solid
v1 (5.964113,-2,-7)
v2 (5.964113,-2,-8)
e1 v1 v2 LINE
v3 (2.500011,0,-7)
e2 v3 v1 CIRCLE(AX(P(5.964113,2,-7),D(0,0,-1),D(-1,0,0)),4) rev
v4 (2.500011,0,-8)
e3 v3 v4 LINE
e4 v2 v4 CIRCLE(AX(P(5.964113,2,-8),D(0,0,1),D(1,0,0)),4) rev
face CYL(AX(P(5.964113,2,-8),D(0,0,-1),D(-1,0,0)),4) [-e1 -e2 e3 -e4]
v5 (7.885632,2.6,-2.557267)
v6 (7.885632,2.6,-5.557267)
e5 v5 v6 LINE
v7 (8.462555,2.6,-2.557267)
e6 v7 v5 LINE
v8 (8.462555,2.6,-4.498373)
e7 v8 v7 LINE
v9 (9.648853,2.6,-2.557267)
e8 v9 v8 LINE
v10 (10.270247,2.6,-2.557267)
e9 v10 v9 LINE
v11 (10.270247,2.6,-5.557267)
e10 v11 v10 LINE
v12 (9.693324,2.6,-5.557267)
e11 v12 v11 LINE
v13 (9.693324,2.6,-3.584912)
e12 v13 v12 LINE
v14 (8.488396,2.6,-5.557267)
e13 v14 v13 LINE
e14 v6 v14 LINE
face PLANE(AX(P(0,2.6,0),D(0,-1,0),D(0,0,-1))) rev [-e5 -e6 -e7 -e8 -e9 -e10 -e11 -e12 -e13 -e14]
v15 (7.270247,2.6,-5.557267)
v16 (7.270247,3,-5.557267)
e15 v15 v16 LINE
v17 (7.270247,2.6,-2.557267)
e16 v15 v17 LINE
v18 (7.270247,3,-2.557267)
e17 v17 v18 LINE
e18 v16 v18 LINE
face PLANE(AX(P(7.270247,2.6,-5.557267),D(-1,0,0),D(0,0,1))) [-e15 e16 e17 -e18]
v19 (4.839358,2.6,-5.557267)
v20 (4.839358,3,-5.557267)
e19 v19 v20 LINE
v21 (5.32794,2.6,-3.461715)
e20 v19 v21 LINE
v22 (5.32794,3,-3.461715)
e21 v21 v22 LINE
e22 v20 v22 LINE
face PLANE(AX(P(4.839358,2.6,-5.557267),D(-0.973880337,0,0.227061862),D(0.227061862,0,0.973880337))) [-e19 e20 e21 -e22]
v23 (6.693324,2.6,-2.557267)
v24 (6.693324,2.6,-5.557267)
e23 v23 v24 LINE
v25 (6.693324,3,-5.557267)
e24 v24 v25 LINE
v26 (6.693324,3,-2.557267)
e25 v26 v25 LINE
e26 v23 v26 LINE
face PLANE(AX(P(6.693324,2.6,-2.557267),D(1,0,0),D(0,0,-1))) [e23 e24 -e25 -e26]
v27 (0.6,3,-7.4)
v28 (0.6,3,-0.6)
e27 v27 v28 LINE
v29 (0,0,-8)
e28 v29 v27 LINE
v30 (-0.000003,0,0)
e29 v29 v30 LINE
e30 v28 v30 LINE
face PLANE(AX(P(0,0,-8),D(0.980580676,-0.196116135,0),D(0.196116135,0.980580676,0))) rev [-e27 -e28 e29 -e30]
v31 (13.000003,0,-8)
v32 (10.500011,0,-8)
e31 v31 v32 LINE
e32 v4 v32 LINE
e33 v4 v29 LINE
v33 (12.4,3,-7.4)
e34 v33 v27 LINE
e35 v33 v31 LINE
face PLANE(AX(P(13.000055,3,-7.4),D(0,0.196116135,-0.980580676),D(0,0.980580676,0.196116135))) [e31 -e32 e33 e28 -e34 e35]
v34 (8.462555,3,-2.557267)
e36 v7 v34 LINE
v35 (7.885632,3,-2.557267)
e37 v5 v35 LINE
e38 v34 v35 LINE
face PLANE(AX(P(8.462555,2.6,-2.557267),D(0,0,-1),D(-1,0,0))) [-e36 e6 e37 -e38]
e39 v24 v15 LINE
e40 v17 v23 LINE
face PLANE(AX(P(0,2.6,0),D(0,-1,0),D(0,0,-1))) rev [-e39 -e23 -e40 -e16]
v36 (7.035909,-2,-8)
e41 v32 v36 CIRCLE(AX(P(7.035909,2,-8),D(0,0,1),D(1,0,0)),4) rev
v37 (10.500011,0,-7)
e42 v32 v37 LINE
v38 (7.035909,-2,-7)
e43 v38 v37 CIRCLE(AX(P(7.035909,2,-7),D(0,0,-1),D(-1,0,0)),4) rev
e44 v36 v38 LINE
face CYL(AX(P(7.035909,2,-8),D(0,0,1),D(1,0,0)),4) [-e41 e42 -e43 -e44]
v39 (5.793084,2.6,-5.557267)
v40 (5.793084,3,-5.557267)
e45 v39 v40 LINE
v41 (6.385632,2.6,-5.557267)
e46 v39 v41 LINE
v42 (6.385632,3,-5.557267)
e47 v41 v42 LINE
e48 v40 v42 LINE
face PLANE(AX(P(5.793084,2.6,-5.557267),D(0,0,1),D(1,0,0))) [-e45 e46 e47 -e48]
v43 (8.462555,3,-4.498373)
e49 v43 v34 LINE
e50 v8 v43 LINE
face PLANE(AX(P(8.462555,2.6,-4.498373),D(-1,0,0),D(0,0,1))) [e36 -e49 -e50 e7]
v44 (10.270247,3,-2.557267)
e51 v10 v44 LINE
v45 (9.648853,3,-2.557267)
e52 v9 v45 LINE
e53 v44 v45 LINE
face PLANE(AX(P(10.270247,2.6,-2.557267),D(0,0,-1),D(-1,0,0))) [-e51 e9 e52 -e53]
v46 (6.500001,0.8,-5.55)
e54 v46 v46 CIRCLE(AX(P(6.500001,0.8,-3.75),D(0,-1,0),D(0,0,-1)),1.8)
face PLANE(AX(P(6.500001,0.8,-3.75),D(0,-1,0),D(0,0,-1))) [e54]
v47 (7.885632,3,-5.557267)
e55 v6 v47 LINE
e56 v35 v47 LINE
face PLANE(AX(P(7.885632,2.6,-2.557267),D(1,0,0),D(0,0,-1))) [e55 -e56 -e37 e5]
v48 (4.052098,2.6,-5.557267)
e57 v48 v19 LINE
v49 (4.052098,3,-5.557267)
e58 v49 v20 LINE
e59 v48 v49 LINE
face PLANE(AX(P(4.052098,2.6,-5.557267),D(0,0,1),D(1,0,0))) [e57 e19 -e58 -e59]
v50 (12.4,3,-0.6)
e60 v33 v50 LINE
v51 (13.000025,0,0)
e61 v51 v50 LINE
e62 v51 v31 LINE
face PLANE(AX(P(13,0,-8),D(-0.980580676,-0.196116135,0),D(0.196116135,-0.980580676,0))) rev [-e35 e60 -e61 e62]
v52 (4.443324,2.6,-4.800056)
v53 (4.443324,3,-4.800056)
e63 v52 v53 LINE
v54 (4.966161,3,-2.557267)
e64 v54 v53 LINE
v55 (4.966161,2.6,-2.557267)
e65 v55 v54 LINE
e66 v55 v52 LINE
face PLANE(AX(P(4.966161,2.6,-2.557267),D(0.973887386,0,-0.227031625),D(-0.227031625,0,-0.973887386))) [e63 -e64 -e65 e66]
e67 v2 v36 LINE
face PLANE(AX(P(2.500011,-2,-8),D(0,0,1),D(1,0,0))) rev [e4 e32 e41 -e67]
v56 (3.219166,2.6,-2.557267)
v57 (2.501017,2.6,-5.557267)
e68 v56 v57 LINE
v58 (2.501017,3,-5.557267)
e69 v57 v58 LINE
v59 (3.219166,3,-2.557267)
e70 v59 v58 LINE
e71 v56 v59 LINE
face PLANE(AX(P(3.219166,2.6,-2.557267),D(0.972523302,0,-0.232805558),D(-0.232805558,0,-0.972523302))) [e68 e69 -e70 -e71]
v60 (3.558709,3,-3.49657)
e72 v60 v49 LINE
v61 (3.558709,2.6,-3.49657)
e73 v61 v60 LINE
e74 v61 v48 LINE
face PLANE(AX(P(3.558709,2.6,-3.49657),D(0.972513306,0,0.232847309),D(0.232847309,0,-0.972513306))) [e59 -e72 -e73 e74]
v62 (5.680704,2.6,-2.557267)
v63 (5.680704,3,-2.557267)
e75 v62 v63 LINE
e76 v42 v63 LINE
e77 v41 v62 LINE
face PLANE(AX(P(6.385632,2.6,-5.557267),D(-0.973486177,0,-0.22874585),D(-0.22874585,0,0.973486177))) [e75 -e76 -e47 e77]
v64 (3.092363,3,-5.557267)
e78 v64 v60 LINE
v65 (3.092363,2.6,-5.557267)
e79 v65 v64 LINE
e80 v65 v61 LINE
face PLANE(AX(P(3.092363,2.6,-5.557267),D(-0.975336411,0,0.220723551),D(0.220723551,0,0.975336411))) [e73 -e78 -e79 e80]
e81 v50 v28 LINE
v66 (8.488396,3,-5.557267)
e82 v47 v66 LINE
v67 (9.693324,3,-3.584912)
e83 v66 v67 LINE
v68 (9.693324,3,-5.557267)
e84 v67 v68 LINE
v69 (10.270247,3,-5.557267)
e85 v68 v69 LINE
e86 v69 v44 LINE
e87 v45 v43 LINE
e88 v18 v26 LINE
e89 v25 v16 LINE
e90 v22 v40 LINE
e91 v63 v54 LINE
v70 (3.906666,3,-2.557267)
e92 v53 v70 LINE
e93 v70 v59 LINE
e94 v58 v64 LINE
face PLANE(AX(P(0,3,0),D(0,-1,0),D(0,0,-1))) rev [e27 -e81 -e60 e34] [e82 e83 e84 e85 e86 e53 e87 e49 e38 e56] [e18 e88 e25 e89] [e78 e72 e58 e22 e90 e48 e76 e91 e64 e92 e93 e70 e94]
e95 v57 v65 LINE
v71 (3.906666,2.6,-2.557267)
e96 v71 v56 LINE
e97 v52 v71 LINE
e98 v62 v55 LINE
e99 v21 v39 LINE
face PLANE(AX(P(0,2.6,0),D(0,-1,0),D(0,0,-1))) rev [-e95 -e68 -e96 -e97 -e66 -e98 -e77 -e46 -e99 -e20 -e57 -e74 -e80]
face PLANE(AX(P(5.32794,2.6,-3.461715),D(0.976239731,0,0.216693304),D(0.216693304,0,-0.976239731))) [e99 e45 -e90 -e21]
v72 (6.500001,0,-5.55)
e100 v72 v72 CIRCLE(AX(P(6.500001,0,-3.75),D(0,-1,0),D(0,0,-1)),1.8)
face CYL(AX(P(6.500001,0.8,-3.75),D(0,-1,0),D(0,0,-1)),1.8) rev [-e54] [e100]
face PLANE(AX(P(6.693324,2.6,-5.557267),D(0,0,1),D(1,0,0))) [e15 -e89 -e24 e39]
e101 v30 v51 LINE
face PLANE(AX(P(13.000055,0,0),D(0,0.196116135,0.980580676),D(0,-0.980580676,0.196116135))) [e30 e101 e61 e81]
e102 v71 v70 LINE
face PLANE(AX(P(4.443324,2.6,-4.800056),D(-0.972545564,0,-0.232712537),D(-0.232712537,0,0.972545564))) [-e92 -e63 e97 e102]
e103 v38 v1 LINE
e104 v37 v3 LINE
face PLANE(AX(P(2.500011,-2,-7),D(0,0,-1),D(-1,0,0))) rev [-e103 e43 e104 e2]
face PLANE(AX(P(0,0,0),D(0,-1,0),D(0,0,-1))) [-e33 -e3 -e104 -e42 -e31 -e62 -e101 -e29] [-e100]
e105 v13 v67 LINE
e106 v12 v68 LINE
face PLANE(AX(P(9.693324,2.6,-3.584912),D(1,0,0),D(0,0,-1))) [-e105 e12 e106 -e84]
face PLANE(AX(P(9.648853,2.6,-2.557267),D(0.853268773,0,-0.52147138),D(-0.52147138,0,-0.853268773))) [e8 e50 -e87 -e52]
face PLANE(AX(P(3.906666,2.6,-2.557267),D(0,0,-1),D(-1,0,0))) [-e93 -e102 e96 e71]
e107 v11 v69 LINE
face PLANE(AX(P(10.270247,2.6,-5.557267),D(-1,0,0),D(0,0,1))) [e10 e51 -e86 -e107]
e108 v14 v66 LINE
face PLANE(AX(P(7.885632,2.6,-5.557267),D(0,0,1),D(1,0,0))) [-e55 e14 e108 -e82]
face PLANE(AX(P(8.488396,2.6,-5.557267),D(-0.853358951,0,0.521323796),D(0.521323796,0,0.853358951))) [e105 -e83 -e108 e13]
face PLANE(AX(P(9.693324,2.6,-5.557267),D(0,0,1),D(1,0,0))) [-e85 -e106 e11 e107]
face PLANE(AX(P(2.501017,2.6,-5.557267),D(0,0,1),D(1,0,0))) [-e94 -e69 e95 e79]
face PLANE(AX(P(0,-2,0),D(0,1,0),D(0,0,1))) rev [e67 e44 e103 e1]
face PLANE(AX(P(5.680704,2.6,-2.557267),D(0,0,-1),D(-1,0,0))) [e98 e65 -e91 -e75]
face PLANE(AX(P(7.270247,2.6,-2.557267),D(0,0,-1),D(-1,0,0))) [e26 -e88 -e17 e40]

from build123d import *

# Parameters (mm, degrees)
SKETCH1_W               = 13
SKETCH1_H               = 8
BOSS_EXTRUDE1_DEPTH     = 3
CUT_EXTRUDE1_DEPTH      = 16.556349186
CUT_EXTRUDE1_DEPTH_BACK = 16.556349186
CUT_EXTRUDE2_DEPTH      = 16.556349186
CUT_EXTRUDE2_DEPTH_BACK = 16.556349186
SKETCH4_R               = 1.8
CUT_EXTRUDE3_DEPTH      = 0.8
SKETCH5_W               = 8
SKETCH5_H               = 1
BOSS_EXTRUDE2_DEPTH     = 2
FILLET1_R               = 4
SKETCH6_W               = 0.576923077
SKETCH6_H               = 3
CUT_EXTRUDE4_DEPTH      = 0.4


with BuildPart() as part:
    # Sketch1 → Boss-Extrude1 (new body)
    with BuildSketch(Plane(origin=(0, 0, 0), x_dir=(1, 0, 0), z_dir=(0, 1, 0))):
        with Locations((6.5, 4)):
            Rectangle(SKETCH1_W, SKETCH1_H)
    extrude(amount=BOSS_EXTRUDE1_DEPTH)

    # Sketch2 → Cut-Extrude1 (cut, two sides: drawn at the far end of the back side and taken through both)
    with BuildSketch(Plane.XY.offset(-CUT_EXTRUDE1_DEPTH_BACK)):
        Polygon((0, 0), (0.6, 3), (0, 3), align=None)
        Polygon((13, 0), (12.4, 3), (13, 3), align=None)
    extrude(amount=CUT_EXTRUDE1_DEPTH + CUT_EXTRUDE1_DEPTH_BACK, mode=Mode.SUBTRACT)

    # Sketch3 → Cut-Extrude2 (cut, two sides: drawn at the far end of the back side and taken through both)
    with BuildSketch(Plane(origin=(0, 0, 0), x_dir=(0, 0, -1), z_dir=(1, 0, 0)).offset(-CUT_EXTRUDE2_DEPTH_BACK)):
        Polygon((0, 0), (0.6, 3), (0, 3), align=None)
        Polygon((8, 3), (7.4, 3), (8, 0), align=None)
    extrude(amount=CUT_EXTRUDE2_DEPTH + CUT_EXTRUDE2_DEPTH_BACK, mode=Mode.SUBTRACT)

    # Sketch4 → Cut-Extrude3 (cut)
    with BuildSketch(Plane.XZ):
        with Locations(Location((6.50000125, -3.75, 0), (0, 0, 270))):
            Circle(SKETCH4_R)
    extrude(amount=-CUT_EXTRUDE3_DEPTH, mode=Mode.SUBTRACT)

    # Sketch5 → Boss-Extrude2 (add)
    with BuildSketch(Plane.XZ):
        with Locations((6.500011, -7.5)):
            Rectangle(SKETCH5_W, SKETCH5_H)
    extrude(amount=BOSS_EXTRUDE2_DEPTH)

    # Fillet1
    # the kernel refuses this fillet: 4 mm, written as the material it takes off along each edge
    with BuildSketch(Plane(origin=(10.500011, -2, -16.660254038), x_dir=(0, 1, 0), z_dir=(0, 0, 1)), Plane(origin=(2.500011, -2, 1.660254038), x_dir=(0, 1, 0), z_dir=(0, 0, -1))) as fillet1_piece_1:
        with BuildLine():
            CenterArc((4, 3.464101615), FILLET1_R, 180, 60)
            Line((0, 3.464101615), (-0.08, 3.464101615))
            Line((-0.08, 3.464101615), (-0.08, 0))
            Line((-0.08, 0), (0, -0.08))
            ThreePointArc((0, -0.08), (1, -0.08), (1.96, -0.069282032))
            Line((1.96, -0.069282032), (2, 0))
        make_face()
    extrude(amount=18.320508076, mode=Mode.SUBTRACT)

    # Sketch6 → Cut-Extrude4 (cut)
    with BuildSketch(Plane(origin=(0, 3, 0), x_dir=(1, 0, 0), z_dir=(0, 1, 0))):
        Polygon((3.219165588, 2.557267472), (2.50101655, 5.557267472), (3.092362704, 5.557267472), (3.558708858, 3.496570357), (4.052098281, 5.557267472), (4.839357896, 5.557267472), (5.327939627, 3.461714587), (5.793083858, 5.557267472), (6.385631934, 5.557267472), (5.68070405, 2.557267472), (4.966160781, 2.557267472), (4.443324242, 4.800055934), (3.906665588, 2.557267472), align=None)
        with Locations((6.981785781, 4.057267472)):
            Rectangle(SKETCH6_W, SKETCH6_H)
        Polygon((7.885631934, 2.557267472), (7.885631934, 5.557267472), (8.488396358, 5.557267472), (9.693324242, 3.584911703), (9.693324242, 5.557267472), (10.270247319, 5.557267472), (10.270247319, 2.557267472), (9.648853088, 2.557267472), (8.462555011, 4.498373241), (8.462555011, 2.557267472), align=None)
    extrude(amount=-CUT_EXTRUDE4_DEPTH, mode=Mode.SUBTRACT)


solid = part.part
